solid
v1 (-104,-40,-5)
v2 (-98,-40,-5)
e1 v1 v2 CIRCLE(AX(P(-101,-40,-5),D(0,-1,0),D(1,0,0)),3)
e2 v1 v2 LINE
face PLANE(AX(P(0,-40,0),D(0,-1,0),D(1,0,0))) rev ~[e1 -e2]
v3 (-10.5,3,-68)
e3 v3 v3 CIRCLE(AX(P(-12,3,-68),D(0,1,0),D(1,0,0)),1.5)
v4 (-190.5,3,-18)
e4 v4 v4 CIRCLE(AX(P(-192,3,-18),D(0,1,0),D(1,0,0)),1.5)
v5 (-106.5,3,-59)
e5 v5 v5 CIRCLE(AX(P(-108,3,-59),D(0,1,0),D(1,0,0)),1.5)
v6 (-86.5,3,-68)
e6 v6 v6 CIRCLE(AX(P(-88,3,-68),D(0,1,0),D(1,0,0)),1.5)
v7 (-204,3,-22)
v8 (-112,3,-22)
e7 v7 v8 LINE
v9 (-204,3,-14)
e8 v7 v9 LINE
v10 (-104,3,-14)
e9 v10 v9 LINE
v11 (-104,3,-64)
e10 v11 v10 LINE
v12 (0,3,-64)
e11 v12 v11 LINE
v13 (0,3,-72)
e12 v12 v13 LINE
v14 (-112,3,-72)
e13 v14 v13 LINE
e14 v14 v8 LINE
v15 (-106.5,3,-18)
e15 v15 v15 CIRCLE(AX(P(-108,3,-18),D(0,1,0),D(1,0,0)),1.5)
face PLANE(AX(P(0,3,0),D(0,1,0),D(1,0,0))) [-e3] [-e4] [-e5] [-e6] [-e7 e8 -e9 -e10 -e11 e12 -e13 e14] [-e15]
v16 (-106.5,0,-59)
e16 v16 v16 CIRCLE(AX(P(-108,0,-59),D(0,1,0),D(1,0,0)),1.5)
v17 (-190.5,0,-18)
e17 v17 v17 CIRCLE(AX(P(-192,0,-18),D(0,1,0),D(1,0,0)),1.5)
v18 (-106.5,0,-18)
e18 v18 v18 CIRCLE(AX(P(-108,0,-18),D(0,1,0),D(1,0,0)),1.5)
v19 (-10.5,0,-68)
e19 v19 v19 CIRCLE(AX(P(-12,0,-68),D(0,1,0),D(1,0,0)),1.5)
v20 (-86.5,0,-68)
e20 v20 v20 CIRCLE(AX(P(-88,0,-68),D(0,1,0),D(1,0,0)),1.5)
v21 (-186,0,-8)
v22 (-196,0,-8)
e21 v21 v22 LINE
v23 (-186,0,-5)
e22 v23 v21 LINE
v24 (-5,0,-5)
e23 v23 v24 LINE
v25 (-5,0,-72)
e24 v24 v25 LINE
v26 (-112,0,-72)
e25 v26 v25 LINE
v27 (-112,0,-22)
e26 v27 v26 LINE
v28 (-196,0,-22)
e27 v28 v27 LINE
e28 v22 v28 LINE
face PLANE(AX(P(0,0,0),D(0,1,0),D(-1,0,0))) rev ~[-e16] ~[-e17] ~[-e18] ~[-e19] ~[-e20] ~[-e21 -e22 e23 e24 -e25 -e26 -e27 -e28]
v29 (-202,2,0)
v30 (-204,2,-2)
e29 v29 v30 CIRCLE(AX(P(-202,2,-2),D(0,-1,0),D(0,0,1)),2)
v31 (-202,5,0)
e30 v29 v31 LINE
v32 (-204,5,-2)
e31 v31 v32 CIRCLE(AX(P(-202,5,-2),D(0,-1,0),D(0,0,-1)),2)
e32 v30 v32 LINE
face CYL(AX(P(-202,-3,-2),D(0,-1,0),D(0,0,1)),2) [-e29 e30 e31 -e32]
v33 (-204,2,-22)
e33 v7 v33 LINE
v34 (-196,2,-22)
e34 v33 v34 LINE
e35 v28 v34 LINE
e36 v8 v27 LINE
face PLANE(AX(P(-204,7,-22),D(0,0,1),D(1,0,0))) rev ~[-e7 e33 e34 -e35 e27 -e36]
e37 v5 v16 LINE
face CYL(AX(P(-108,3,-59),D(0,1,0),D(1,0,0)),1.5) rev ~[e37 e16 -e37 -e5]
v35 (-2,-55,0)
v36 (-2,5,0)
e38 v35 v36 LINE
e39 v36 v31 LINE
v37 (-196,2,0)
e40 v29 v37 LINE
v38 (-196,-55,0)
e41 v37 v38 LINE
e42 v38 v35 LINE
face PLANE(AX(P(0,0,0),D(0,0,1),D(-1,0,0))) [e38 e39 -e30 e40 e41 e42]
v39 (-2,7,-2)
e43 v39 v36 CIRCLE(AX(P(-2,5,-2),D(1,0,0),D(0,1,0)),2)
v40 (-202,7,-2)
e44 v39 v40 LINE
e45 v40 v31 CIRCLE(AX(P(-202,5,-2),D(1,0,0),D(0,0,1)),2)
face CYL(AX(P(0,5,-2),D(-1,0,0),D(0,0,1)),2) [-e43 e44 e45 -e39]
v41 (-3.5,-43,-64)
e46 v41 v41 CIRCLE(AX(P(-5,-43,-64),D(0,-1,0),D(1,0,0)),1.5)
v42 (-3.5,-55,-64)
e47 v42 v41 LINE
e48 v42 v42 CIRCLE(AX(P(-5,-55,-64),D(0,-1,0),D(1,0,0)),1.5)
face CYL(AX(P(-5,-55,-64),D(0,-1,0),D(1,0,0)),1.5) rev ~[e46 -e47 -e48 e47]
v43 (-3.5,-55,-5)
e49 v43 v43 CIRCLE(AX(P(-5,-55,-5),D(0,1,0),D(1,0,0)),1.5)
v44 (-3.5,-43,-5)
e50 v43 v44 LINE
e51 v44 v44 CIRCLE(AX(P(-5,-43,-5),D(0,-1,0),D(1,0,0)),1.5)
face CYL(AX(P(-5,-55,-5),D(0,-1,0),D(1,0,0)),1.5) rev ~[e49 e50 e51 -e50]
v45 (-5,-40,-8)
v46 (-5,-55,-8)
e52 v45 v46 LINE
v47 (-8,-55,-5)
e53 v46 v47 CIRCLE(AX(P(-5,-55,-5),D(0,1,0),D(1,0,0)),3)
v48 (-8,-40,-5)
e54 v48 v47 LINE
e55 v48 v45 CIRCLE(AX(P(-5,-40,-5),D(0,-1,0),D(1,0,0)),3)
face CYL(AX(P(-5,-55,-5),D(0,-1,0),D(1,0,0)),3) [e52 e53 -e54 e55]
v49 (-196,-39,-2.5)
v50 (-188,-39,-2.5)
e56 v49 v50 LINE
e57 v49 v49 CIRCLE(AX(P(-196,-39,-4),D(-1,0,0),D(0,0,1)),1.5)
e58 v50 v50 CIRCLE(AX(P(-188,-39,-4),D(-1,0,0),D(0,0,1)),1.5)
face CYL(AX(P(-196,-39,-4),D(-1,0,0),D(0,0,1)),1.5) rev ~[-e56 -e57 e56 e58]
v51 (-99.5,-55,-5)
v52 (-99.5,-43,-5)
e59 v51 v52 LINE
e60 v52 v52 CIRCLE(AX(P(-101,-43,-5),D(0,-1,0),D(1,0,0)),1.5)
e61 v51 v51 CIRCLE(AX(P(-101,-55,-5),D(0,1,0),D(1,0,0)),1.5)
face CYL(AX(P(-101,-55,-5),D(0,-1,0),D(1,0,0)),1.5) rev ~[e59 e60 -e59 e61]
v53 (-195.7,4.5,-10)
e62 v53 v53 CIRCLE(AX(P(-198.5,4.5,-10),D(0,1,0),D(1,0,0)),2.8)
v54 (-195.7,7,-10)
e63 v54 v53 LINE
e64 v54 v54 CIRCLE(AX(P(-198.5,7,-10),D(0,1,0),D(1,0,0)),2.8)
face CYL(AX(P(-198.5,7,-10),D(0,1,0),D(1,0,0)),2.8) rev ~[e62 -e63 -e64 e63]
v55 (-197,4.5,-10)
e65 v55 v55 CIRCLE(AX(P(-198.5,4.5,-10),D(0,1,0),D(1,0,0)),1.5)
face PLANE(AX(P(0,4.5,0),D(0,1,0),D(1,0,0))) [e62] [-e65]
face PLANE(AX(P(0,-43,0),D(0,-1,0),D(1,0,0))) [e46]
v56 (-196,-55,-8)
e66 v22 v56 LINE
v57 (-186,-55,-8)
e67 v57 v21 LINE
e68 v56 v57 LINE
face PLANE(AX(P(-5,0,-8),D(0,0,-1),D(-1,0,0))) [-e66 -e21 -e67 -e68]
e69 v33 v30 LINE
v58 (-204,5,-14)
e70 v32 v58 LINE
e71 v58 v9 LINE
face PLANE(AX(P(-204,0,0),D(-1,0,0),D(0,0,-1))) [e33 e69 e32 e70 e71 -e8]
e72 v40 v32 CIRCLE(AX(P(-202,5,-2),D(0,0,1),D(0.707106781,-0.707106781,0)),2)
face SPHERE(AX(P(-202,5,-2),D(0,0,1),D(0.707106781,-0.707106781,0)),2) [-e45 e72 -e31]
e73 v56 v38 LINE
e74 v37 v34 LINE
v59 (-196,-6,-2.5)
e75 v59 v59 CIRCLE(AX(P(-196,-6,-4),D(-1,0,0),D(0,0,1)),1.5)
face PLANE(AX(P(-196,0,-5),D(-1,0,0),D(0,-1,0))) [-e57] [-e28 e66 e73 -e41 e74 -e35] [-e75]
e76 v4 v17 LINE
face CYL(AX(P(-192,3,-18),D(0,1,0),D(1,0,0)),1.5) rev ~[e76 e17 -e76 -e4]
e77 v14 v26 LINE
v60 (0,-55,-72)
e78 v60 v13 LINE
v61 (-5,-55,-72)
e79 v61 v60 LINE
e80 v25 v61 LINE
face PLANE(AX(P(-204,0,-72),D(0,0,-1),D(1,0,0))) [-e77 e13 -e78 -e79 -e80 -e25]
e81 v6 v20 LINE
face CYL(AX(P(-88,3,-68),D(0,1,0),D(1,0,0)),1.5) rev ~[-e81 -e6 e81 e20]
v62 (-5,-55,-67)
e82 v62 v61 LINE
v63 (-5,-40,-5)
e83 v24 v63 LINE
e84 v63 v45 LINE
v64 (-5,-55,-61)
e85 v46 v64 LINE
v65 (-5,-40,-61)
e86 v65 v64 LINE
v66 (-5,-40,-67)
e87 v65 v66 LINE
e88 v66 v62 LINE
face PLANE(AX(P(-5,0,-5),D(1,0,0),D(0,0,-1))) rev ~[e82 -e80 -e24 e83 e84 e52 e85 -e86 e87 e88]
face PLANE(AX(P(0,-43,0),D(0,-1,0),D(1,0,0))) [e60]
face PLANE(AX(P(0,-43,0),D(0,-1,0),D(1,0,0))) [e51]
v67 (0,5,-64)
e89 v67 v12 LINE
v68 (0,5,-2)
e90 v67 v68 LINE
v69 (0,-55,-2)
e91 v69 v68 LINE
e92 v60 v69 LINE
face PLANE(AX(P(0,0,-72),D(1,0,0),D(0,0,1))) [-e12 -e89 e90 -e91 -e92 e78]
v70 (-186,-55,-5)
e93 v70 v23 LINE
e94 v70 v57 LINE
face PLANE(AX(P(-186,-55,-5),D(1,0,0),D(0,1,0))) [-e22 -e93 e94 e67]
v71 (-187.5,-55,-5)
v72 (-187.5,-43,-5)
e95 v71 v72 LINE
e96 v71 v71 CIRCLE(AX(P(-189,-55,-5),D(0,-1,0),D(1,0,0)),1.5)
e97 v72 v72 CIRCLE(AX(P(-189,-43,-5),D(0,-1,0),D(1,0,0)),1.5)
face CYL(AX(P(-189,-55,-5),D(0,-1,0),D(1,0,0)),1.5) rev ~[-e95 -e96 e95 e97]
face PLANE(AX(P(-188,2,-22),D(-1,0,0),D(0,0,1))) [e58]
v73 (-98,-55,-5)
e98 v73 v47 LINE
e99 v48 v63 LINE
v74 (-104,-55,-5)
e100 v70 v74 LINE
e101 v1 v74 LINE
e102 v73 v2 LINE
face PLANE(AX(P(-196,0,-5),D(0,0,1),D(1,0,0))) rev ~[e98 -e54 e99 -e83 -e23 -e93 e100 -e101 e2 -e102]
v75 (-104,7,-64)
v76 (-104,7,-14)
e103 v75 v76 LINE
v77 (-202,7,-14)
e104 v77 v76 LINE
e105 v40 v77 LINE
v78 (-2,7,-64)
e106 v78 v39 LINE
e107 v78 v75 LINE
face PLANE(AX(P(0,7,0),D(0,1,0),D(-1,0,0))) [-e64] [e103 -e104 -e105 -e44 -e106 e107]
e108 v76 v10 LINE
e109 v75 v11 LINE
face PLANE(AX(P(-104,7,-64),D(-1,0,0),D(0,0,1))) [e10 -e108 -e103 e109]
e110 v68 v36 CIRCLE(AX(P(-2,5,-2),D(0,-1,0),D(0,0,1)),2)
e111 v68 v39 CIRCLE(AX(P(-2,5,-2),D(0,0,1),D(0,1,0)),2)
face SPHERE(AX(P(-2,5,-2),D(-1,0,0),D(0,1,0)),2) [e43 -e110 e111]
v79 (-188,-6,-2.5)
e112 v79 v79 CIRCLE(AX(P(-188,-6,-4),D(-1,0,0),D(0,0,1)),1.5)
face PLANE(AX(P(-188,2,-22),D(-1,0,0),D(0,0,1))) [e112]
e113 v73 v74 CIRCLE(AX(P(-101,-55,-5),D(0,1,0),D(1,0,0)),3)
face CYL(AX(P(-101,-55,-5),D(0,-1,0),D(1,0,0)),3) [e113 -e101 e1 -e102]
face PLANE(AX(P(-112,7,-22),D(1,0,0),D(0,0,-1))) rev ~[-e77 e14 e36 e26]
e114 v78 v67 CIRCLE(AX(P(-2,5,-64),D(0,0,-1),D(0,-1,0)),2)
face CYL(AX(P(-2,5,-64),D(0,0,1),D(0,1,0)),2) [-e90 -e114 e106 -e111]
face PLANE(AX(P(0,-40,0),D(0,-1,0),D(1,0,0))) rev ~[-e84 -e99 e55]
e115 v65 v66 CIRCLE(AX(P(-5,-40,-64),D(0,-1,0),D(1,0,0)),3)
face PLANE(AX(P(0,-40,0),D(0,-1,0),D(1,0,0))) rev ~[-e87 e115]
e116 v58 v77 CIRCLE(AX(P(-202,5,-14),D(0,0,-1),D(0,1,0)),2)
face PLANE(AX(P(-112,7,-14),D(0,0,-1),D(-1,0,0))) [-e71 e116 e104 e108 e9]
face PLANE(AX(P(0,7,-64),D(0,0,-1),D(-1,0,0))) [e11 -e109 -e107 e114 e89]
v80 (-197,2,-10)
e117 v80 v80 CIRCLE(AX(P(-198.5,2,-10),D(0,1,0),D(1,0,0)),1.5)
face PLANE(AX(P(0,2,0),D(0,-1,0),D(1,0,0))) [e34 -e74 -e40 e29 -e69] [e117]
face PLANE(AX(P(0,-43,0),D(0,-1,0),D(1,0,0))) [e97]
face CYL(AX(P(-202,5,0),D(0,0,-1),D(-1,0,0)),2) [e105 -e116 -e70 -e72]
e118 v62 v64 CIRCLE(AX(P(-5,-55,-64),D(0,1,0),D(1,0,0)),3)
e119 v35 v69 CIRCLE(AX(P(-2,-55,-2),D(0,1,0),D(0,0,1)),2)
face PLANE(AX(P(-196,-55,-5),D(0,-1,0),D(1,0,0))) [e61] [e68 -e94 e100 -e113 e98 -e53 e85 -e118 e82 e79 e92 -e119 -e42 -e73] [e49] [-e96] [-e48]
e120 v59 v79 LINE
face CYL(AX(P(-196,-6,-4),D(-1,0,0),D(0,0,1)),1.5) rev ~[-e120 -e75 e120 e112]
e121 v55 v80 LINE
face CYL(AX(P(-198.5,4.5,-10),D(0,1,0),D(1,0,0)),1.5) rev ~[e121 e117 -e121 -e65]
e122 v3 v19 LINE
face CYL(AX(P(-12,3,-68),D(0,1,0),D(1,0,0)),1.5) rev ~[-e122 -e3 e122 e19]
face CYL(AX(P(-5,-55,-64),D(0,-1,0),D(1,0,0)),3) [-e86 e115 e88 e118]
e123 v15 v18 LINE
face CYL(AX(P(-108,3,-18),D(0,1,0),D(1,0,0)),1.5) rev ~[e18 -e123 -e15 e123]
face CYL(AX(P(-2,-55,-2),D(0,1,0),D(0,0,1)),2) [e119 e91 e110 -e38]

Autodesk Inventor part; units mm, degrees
ref_plane "YZ Plane" through (0, 0, 0) normal (1, 0, 0) x (0, 1, 0)
ref_plane "XZ Plane" through (0, 0, 0) normal (0, 1, 0) x (-1, 0, 0)
ref_plane "XY Plane" through (0, 0, 0) normal (0, 0, 1) x (1, 0, 0)
sketch "スケッチ1" plane through (0, 0, 0) normal (0, 1, 0) x (-1, 0, 0)
  line L0 (0, 0) -> (204, 0)
  line L1 (204, 0) -> (204, -72)
  line L2 (204, -72) -> (0, -72)
  line L3 (0, -72) -> (0, 0)
  dimension "d0" = 204
  dimension "d1" = 72
extrude "押し出し1" add sketch "スケッチ1" along normal blind 7
sketch "スケッチ2" plane through (0, 7, 0) normal (0, 1, 0) x (1, 0, 0)
  line L0 (-204, 22) -> (-112, 22)
  line L1 (-112, 22) -> (-112, 72)
  line L2 (-112, 72) -> (-204, 72)
  line L3 (-204, 72) -> (-204, 22)
  line L4 (-204, 72) -> (-204, 0) projected
  line L5 (0, 72) -> (-204, 72) projected
  line L6 (-204, 0) -> (0, 0) projected
  dimension "d5" = 92
  dimension "d76" = 50
extrude "押し出し2" cut sketch "スケッチ2" against normal through all
sketch "スケッチ3" plane through (0, 7, 0) normal (0, 1, 0) x (1, 0, 0)
  line L0 (-204, 22) -> (-204, 0) projected
  line L1 (-204, 22) -> (-112, 22)
  line L2 (-112, 22) -> (-112, 14)
  line L3 (-112, 14) -> (-204, 14)
  line L4 (-204, 14) -> (-204, 22)
  line L5 (-112, 72) -> (-112, 22) projected
  line L6 (-112, 72) -> (-104, 72)
  line L7 (-104, 72) -> (-104, 14)
  line L8 (-104, 14) -> (-112, 14)
  line L9 (-112, 14) -> (-112, 72)
  line L10 (0, 72) -> (-112, 72) projected
  line L11 (0, 0) -> (0, 72) projected
  line L12 (-112, 72) -> (0, 72)
  line L13 (0, 72) -> (0, 64)
  line L14 (0, 64) -> (-112, 64)
  line L15 (-112, 64) -> (-112, 72)
  point P0 (-204, 14)
  point P1 (-104, 64)
  dimension "d8" = 8
  dimension "d9" = 8
  dimension "d19" = 8
extrude "押し出し3" cut sketch "スケッチ3" against normal blind 4
sketch "スケッチ4" plane through (0, 3, 0) normal (0, 1, 0) x (1, 0, 0)
  circle A0 centre (-192, 18) radius 1.5
  circle A1 centre (-108, 18) radius 1.5
  circle A2 centre (-108, 59) radius 1.5
  line L0 (-112, 72) -> (0, 72) projected
  line L1 (-204, 14) -> (-204, 22) projected
  line L2 (-112, 22) -> (-112, 72) projected
  circle A3 centre (-88, 68) radius 1.5
  circle A4 centre (-12, 68) radius 1.5
  line L3 (0, 72) -> (0, 64) projected
  point P0 (0, 0)
  point P1 (-204, 18)
  point P2 (-204, 18)
  dimension "d12" = 3
  dimension "d13" = 3
  dimension "d14" = 3
  dimension "d16" = 12
  dimension "d20" = 4
  dimension "d21" = 3
  dimension "d22" = 3
  dimension "d23" = 4
  dimension "d24" = 24
  dimension "d25" = 12
  dimension "d32" = 41
  dimension "d34" = 76
extrude "押し出し4" cut sketch "スケッチ4" against normal through all
sketch "スケッチ5" plane through (0, 0, 0) normal (0, -1, 0) x (1, 0, 0)
  line L0 (-204, 0) -> (0, 0) projected
  line L1 (-204, -22) -> (-112, -22) projected
  line L2 (-204, 0) -> (-196, 0)
  line L3 (-196, 0) -> (-196, -22)
  line L4 (-196, -22) -> (-204, -22)
  line L5 (-204, -22) -> (-204, 0)
  dimension "d26" = 8
extrude "押し出し5" cut sketch "スケッチ5" against normal blind 2
sketch "スケッチ6" plane through (0, 0, 0) normal (0, -1, 0) x (1, 0, 0)
  line L0 (-196, 0) -> (-196, -22) projected
  line L1 (0, 0) -> (-196, 0)
  line L2 (-196, 0) -> (-196, -5)
  line L3 (-196, -5) -> (0, -5)
  line L4 (0, -5) -> (0, 0)
  line L5 (-196, 0) -> (0, 0) projected
  line L6 (-112, -72) -> (0, -72) projected
  line L7 (0, 0) -> (-5, 0)
  line L8 (-5, 0) -> (-5, -72)
  line L9 (-5, -72) -> (0, -72)
  line L10 (0, -72) -> (0, 0)
  point P0 (0, -72)
  point P1 (-5, -5)
  dimension "d29" = 5
  dimension "d33" = 5
extrude "押し出し6" add sketch "スケッチ6" along normal blind 55
fillet "フィレット1" radius 2 4 edges at (-102, 7, 0) (0, 7, -32) (0, -24, 0) (-204, 7, -7)
sketch "スケッチ7" plane through (-5, 0, -5) normal (0, 0, -1) x (-1, 0, 0)
  line L0 (191, 2) -> (191, -55) projected
  line L1 (0, 0) -> (191, 0) projected
  line L2 (191, -55) -> (181, -55)
  line L3 (181, -55) -> (181, 0)
  line L4 (181, 0) -> (191, 0)
  line L5 (191, 0) -> (191, -55)
  point P0 (-5, 0)
  dimension "d36" = 10
extrude "押し出し7" add sketch "スケッチ7" along normal blind 3
sketch "スケッチ8" plane through (-196, 2, -22) normal (-1, 0, 0) x (0, 0, 1)
  circle A0 centre (18, -41) radius 1.5
  circle A1 centre (18, -8) radius 1.5
  line L0 (22, -57) -> (14, -57) projected
  line L1 (0, 0) -> (22, 0) projected
  point P0 (22, -2)
  point P1 (18, -57)
  point P2 (18, -57)
  dimension "d39" = 3
  dimension "d40" = 3
  dimension "d41" = 16
  dimension "d62" = 8
extrude "押し出し8" cut sketch "スケッチ8" against normal blind 8
sketch "スケッチ9" plane through (0, -55, 0) normal (0, -1, 0) x (1, 0, 0)
  line L0 (-5, -5) -> (-5, -72) projected
  circle A0 centre (-5, -5) radius 3
  circle A1 centre (-5, -64) radius 3
  line L1 (-186, -5) -> (-5, -5) projected
  circle A2 centre (-101, -5) radius 3
  circle A3 centre (-191, -5) radius 3
  line L2 (-5, -72) -> (0, -72) projected
  point P0 (0, 0)
  dimension "d45" = 6
  dimension "d46" = 6
  dimension "d47" = 6
  dimension "d48" = 96
  dimension "d49" = 6
  dimension "d50" = 90
  dimension "d78" = 8
extrude "押し出し9" add sketch "スケッチ9" against normal blind 15 contours L1 A0 L0 | L0 A0 L1 | A1 L0 | L0 A1 | A2 L1 | L1 A2
sketch "スケッチ10" plane through (0, -55, 0) normal (0, -1, 0) x (1, 0, 0)
  line L0 (-5, -5) -> (-186, -5) projected
  circle A0 centre (-5, -5) radius 1.5
  line L1 (-98, -5) -> (-104, -5) projected
  circle A1 centre (-101, -5) radius 1.5
  arc A2 (-5, -61) -> (-5, -67) centre (-5, -64) ccw projected
  circle A3 centre (-5, -64) radius 1.5
  circle A4 centre (-189, -5) radius 1.5
  line L2 (-186, -8) -> (-196, -8) projected
  line L3 (-186, -5) -> (-186, -8) projected
  point P0 (0, 0)
  dimension "d54" = 3
  dimension "d55" = 3
  dimension "d56" = 3
  dimension "d57" = 3
  dimension "d58" = 3
  dimension "d59" = 3
extrude "押し出し10" cut sketch "スケッチ10" against normal blind 12
sketch "スケッチ11" plane through (0, 7, 0) normal (0, 1, 0) x (1, 0, 0)
  circle A0 centre (-198.5, 10) radius 2.8
  line L0 (-204, 14) -> (-204, 0) projected
  line L1 (-204, 0) -> (-2, 0) projected
  line L2 (-104, 14) -> (-202, 14) projected
  line L3 (-202, 2) -> (-202, 14) projected
  point P0 (0, 0)
  dimension "d63" = 5.6
  dimension "d65" = 5.5
  dimension "d77" = 4
  dimension "d79" = 10
extrude "押し出し11" cut sketch "スケッチ11" against normal blind 2.5
sketch "スケッチ12" plane through (-198.5, 4.5, -10) normal (0, 1, 0) x (1, 0, 0)
  line L0 (2.5, -10) -> (2.5, 12) projected
  circle A0 centre (0, 0) radius 1.5
  circle A1 centre (0, 0) radius 2.8 projected
  point P0 (198.5, -10)
  dimension "d71" = 3
extrude "押し出し12" cut sketch "スケッチ12" against normal through all contours A0
fillet "フィレット2" radius 2 2 edges at (-203.4142, 6.4142, -0.5858) (-204, 3.5, 0)
properties part number "オンゲキボタン_top1_3D プリント"
